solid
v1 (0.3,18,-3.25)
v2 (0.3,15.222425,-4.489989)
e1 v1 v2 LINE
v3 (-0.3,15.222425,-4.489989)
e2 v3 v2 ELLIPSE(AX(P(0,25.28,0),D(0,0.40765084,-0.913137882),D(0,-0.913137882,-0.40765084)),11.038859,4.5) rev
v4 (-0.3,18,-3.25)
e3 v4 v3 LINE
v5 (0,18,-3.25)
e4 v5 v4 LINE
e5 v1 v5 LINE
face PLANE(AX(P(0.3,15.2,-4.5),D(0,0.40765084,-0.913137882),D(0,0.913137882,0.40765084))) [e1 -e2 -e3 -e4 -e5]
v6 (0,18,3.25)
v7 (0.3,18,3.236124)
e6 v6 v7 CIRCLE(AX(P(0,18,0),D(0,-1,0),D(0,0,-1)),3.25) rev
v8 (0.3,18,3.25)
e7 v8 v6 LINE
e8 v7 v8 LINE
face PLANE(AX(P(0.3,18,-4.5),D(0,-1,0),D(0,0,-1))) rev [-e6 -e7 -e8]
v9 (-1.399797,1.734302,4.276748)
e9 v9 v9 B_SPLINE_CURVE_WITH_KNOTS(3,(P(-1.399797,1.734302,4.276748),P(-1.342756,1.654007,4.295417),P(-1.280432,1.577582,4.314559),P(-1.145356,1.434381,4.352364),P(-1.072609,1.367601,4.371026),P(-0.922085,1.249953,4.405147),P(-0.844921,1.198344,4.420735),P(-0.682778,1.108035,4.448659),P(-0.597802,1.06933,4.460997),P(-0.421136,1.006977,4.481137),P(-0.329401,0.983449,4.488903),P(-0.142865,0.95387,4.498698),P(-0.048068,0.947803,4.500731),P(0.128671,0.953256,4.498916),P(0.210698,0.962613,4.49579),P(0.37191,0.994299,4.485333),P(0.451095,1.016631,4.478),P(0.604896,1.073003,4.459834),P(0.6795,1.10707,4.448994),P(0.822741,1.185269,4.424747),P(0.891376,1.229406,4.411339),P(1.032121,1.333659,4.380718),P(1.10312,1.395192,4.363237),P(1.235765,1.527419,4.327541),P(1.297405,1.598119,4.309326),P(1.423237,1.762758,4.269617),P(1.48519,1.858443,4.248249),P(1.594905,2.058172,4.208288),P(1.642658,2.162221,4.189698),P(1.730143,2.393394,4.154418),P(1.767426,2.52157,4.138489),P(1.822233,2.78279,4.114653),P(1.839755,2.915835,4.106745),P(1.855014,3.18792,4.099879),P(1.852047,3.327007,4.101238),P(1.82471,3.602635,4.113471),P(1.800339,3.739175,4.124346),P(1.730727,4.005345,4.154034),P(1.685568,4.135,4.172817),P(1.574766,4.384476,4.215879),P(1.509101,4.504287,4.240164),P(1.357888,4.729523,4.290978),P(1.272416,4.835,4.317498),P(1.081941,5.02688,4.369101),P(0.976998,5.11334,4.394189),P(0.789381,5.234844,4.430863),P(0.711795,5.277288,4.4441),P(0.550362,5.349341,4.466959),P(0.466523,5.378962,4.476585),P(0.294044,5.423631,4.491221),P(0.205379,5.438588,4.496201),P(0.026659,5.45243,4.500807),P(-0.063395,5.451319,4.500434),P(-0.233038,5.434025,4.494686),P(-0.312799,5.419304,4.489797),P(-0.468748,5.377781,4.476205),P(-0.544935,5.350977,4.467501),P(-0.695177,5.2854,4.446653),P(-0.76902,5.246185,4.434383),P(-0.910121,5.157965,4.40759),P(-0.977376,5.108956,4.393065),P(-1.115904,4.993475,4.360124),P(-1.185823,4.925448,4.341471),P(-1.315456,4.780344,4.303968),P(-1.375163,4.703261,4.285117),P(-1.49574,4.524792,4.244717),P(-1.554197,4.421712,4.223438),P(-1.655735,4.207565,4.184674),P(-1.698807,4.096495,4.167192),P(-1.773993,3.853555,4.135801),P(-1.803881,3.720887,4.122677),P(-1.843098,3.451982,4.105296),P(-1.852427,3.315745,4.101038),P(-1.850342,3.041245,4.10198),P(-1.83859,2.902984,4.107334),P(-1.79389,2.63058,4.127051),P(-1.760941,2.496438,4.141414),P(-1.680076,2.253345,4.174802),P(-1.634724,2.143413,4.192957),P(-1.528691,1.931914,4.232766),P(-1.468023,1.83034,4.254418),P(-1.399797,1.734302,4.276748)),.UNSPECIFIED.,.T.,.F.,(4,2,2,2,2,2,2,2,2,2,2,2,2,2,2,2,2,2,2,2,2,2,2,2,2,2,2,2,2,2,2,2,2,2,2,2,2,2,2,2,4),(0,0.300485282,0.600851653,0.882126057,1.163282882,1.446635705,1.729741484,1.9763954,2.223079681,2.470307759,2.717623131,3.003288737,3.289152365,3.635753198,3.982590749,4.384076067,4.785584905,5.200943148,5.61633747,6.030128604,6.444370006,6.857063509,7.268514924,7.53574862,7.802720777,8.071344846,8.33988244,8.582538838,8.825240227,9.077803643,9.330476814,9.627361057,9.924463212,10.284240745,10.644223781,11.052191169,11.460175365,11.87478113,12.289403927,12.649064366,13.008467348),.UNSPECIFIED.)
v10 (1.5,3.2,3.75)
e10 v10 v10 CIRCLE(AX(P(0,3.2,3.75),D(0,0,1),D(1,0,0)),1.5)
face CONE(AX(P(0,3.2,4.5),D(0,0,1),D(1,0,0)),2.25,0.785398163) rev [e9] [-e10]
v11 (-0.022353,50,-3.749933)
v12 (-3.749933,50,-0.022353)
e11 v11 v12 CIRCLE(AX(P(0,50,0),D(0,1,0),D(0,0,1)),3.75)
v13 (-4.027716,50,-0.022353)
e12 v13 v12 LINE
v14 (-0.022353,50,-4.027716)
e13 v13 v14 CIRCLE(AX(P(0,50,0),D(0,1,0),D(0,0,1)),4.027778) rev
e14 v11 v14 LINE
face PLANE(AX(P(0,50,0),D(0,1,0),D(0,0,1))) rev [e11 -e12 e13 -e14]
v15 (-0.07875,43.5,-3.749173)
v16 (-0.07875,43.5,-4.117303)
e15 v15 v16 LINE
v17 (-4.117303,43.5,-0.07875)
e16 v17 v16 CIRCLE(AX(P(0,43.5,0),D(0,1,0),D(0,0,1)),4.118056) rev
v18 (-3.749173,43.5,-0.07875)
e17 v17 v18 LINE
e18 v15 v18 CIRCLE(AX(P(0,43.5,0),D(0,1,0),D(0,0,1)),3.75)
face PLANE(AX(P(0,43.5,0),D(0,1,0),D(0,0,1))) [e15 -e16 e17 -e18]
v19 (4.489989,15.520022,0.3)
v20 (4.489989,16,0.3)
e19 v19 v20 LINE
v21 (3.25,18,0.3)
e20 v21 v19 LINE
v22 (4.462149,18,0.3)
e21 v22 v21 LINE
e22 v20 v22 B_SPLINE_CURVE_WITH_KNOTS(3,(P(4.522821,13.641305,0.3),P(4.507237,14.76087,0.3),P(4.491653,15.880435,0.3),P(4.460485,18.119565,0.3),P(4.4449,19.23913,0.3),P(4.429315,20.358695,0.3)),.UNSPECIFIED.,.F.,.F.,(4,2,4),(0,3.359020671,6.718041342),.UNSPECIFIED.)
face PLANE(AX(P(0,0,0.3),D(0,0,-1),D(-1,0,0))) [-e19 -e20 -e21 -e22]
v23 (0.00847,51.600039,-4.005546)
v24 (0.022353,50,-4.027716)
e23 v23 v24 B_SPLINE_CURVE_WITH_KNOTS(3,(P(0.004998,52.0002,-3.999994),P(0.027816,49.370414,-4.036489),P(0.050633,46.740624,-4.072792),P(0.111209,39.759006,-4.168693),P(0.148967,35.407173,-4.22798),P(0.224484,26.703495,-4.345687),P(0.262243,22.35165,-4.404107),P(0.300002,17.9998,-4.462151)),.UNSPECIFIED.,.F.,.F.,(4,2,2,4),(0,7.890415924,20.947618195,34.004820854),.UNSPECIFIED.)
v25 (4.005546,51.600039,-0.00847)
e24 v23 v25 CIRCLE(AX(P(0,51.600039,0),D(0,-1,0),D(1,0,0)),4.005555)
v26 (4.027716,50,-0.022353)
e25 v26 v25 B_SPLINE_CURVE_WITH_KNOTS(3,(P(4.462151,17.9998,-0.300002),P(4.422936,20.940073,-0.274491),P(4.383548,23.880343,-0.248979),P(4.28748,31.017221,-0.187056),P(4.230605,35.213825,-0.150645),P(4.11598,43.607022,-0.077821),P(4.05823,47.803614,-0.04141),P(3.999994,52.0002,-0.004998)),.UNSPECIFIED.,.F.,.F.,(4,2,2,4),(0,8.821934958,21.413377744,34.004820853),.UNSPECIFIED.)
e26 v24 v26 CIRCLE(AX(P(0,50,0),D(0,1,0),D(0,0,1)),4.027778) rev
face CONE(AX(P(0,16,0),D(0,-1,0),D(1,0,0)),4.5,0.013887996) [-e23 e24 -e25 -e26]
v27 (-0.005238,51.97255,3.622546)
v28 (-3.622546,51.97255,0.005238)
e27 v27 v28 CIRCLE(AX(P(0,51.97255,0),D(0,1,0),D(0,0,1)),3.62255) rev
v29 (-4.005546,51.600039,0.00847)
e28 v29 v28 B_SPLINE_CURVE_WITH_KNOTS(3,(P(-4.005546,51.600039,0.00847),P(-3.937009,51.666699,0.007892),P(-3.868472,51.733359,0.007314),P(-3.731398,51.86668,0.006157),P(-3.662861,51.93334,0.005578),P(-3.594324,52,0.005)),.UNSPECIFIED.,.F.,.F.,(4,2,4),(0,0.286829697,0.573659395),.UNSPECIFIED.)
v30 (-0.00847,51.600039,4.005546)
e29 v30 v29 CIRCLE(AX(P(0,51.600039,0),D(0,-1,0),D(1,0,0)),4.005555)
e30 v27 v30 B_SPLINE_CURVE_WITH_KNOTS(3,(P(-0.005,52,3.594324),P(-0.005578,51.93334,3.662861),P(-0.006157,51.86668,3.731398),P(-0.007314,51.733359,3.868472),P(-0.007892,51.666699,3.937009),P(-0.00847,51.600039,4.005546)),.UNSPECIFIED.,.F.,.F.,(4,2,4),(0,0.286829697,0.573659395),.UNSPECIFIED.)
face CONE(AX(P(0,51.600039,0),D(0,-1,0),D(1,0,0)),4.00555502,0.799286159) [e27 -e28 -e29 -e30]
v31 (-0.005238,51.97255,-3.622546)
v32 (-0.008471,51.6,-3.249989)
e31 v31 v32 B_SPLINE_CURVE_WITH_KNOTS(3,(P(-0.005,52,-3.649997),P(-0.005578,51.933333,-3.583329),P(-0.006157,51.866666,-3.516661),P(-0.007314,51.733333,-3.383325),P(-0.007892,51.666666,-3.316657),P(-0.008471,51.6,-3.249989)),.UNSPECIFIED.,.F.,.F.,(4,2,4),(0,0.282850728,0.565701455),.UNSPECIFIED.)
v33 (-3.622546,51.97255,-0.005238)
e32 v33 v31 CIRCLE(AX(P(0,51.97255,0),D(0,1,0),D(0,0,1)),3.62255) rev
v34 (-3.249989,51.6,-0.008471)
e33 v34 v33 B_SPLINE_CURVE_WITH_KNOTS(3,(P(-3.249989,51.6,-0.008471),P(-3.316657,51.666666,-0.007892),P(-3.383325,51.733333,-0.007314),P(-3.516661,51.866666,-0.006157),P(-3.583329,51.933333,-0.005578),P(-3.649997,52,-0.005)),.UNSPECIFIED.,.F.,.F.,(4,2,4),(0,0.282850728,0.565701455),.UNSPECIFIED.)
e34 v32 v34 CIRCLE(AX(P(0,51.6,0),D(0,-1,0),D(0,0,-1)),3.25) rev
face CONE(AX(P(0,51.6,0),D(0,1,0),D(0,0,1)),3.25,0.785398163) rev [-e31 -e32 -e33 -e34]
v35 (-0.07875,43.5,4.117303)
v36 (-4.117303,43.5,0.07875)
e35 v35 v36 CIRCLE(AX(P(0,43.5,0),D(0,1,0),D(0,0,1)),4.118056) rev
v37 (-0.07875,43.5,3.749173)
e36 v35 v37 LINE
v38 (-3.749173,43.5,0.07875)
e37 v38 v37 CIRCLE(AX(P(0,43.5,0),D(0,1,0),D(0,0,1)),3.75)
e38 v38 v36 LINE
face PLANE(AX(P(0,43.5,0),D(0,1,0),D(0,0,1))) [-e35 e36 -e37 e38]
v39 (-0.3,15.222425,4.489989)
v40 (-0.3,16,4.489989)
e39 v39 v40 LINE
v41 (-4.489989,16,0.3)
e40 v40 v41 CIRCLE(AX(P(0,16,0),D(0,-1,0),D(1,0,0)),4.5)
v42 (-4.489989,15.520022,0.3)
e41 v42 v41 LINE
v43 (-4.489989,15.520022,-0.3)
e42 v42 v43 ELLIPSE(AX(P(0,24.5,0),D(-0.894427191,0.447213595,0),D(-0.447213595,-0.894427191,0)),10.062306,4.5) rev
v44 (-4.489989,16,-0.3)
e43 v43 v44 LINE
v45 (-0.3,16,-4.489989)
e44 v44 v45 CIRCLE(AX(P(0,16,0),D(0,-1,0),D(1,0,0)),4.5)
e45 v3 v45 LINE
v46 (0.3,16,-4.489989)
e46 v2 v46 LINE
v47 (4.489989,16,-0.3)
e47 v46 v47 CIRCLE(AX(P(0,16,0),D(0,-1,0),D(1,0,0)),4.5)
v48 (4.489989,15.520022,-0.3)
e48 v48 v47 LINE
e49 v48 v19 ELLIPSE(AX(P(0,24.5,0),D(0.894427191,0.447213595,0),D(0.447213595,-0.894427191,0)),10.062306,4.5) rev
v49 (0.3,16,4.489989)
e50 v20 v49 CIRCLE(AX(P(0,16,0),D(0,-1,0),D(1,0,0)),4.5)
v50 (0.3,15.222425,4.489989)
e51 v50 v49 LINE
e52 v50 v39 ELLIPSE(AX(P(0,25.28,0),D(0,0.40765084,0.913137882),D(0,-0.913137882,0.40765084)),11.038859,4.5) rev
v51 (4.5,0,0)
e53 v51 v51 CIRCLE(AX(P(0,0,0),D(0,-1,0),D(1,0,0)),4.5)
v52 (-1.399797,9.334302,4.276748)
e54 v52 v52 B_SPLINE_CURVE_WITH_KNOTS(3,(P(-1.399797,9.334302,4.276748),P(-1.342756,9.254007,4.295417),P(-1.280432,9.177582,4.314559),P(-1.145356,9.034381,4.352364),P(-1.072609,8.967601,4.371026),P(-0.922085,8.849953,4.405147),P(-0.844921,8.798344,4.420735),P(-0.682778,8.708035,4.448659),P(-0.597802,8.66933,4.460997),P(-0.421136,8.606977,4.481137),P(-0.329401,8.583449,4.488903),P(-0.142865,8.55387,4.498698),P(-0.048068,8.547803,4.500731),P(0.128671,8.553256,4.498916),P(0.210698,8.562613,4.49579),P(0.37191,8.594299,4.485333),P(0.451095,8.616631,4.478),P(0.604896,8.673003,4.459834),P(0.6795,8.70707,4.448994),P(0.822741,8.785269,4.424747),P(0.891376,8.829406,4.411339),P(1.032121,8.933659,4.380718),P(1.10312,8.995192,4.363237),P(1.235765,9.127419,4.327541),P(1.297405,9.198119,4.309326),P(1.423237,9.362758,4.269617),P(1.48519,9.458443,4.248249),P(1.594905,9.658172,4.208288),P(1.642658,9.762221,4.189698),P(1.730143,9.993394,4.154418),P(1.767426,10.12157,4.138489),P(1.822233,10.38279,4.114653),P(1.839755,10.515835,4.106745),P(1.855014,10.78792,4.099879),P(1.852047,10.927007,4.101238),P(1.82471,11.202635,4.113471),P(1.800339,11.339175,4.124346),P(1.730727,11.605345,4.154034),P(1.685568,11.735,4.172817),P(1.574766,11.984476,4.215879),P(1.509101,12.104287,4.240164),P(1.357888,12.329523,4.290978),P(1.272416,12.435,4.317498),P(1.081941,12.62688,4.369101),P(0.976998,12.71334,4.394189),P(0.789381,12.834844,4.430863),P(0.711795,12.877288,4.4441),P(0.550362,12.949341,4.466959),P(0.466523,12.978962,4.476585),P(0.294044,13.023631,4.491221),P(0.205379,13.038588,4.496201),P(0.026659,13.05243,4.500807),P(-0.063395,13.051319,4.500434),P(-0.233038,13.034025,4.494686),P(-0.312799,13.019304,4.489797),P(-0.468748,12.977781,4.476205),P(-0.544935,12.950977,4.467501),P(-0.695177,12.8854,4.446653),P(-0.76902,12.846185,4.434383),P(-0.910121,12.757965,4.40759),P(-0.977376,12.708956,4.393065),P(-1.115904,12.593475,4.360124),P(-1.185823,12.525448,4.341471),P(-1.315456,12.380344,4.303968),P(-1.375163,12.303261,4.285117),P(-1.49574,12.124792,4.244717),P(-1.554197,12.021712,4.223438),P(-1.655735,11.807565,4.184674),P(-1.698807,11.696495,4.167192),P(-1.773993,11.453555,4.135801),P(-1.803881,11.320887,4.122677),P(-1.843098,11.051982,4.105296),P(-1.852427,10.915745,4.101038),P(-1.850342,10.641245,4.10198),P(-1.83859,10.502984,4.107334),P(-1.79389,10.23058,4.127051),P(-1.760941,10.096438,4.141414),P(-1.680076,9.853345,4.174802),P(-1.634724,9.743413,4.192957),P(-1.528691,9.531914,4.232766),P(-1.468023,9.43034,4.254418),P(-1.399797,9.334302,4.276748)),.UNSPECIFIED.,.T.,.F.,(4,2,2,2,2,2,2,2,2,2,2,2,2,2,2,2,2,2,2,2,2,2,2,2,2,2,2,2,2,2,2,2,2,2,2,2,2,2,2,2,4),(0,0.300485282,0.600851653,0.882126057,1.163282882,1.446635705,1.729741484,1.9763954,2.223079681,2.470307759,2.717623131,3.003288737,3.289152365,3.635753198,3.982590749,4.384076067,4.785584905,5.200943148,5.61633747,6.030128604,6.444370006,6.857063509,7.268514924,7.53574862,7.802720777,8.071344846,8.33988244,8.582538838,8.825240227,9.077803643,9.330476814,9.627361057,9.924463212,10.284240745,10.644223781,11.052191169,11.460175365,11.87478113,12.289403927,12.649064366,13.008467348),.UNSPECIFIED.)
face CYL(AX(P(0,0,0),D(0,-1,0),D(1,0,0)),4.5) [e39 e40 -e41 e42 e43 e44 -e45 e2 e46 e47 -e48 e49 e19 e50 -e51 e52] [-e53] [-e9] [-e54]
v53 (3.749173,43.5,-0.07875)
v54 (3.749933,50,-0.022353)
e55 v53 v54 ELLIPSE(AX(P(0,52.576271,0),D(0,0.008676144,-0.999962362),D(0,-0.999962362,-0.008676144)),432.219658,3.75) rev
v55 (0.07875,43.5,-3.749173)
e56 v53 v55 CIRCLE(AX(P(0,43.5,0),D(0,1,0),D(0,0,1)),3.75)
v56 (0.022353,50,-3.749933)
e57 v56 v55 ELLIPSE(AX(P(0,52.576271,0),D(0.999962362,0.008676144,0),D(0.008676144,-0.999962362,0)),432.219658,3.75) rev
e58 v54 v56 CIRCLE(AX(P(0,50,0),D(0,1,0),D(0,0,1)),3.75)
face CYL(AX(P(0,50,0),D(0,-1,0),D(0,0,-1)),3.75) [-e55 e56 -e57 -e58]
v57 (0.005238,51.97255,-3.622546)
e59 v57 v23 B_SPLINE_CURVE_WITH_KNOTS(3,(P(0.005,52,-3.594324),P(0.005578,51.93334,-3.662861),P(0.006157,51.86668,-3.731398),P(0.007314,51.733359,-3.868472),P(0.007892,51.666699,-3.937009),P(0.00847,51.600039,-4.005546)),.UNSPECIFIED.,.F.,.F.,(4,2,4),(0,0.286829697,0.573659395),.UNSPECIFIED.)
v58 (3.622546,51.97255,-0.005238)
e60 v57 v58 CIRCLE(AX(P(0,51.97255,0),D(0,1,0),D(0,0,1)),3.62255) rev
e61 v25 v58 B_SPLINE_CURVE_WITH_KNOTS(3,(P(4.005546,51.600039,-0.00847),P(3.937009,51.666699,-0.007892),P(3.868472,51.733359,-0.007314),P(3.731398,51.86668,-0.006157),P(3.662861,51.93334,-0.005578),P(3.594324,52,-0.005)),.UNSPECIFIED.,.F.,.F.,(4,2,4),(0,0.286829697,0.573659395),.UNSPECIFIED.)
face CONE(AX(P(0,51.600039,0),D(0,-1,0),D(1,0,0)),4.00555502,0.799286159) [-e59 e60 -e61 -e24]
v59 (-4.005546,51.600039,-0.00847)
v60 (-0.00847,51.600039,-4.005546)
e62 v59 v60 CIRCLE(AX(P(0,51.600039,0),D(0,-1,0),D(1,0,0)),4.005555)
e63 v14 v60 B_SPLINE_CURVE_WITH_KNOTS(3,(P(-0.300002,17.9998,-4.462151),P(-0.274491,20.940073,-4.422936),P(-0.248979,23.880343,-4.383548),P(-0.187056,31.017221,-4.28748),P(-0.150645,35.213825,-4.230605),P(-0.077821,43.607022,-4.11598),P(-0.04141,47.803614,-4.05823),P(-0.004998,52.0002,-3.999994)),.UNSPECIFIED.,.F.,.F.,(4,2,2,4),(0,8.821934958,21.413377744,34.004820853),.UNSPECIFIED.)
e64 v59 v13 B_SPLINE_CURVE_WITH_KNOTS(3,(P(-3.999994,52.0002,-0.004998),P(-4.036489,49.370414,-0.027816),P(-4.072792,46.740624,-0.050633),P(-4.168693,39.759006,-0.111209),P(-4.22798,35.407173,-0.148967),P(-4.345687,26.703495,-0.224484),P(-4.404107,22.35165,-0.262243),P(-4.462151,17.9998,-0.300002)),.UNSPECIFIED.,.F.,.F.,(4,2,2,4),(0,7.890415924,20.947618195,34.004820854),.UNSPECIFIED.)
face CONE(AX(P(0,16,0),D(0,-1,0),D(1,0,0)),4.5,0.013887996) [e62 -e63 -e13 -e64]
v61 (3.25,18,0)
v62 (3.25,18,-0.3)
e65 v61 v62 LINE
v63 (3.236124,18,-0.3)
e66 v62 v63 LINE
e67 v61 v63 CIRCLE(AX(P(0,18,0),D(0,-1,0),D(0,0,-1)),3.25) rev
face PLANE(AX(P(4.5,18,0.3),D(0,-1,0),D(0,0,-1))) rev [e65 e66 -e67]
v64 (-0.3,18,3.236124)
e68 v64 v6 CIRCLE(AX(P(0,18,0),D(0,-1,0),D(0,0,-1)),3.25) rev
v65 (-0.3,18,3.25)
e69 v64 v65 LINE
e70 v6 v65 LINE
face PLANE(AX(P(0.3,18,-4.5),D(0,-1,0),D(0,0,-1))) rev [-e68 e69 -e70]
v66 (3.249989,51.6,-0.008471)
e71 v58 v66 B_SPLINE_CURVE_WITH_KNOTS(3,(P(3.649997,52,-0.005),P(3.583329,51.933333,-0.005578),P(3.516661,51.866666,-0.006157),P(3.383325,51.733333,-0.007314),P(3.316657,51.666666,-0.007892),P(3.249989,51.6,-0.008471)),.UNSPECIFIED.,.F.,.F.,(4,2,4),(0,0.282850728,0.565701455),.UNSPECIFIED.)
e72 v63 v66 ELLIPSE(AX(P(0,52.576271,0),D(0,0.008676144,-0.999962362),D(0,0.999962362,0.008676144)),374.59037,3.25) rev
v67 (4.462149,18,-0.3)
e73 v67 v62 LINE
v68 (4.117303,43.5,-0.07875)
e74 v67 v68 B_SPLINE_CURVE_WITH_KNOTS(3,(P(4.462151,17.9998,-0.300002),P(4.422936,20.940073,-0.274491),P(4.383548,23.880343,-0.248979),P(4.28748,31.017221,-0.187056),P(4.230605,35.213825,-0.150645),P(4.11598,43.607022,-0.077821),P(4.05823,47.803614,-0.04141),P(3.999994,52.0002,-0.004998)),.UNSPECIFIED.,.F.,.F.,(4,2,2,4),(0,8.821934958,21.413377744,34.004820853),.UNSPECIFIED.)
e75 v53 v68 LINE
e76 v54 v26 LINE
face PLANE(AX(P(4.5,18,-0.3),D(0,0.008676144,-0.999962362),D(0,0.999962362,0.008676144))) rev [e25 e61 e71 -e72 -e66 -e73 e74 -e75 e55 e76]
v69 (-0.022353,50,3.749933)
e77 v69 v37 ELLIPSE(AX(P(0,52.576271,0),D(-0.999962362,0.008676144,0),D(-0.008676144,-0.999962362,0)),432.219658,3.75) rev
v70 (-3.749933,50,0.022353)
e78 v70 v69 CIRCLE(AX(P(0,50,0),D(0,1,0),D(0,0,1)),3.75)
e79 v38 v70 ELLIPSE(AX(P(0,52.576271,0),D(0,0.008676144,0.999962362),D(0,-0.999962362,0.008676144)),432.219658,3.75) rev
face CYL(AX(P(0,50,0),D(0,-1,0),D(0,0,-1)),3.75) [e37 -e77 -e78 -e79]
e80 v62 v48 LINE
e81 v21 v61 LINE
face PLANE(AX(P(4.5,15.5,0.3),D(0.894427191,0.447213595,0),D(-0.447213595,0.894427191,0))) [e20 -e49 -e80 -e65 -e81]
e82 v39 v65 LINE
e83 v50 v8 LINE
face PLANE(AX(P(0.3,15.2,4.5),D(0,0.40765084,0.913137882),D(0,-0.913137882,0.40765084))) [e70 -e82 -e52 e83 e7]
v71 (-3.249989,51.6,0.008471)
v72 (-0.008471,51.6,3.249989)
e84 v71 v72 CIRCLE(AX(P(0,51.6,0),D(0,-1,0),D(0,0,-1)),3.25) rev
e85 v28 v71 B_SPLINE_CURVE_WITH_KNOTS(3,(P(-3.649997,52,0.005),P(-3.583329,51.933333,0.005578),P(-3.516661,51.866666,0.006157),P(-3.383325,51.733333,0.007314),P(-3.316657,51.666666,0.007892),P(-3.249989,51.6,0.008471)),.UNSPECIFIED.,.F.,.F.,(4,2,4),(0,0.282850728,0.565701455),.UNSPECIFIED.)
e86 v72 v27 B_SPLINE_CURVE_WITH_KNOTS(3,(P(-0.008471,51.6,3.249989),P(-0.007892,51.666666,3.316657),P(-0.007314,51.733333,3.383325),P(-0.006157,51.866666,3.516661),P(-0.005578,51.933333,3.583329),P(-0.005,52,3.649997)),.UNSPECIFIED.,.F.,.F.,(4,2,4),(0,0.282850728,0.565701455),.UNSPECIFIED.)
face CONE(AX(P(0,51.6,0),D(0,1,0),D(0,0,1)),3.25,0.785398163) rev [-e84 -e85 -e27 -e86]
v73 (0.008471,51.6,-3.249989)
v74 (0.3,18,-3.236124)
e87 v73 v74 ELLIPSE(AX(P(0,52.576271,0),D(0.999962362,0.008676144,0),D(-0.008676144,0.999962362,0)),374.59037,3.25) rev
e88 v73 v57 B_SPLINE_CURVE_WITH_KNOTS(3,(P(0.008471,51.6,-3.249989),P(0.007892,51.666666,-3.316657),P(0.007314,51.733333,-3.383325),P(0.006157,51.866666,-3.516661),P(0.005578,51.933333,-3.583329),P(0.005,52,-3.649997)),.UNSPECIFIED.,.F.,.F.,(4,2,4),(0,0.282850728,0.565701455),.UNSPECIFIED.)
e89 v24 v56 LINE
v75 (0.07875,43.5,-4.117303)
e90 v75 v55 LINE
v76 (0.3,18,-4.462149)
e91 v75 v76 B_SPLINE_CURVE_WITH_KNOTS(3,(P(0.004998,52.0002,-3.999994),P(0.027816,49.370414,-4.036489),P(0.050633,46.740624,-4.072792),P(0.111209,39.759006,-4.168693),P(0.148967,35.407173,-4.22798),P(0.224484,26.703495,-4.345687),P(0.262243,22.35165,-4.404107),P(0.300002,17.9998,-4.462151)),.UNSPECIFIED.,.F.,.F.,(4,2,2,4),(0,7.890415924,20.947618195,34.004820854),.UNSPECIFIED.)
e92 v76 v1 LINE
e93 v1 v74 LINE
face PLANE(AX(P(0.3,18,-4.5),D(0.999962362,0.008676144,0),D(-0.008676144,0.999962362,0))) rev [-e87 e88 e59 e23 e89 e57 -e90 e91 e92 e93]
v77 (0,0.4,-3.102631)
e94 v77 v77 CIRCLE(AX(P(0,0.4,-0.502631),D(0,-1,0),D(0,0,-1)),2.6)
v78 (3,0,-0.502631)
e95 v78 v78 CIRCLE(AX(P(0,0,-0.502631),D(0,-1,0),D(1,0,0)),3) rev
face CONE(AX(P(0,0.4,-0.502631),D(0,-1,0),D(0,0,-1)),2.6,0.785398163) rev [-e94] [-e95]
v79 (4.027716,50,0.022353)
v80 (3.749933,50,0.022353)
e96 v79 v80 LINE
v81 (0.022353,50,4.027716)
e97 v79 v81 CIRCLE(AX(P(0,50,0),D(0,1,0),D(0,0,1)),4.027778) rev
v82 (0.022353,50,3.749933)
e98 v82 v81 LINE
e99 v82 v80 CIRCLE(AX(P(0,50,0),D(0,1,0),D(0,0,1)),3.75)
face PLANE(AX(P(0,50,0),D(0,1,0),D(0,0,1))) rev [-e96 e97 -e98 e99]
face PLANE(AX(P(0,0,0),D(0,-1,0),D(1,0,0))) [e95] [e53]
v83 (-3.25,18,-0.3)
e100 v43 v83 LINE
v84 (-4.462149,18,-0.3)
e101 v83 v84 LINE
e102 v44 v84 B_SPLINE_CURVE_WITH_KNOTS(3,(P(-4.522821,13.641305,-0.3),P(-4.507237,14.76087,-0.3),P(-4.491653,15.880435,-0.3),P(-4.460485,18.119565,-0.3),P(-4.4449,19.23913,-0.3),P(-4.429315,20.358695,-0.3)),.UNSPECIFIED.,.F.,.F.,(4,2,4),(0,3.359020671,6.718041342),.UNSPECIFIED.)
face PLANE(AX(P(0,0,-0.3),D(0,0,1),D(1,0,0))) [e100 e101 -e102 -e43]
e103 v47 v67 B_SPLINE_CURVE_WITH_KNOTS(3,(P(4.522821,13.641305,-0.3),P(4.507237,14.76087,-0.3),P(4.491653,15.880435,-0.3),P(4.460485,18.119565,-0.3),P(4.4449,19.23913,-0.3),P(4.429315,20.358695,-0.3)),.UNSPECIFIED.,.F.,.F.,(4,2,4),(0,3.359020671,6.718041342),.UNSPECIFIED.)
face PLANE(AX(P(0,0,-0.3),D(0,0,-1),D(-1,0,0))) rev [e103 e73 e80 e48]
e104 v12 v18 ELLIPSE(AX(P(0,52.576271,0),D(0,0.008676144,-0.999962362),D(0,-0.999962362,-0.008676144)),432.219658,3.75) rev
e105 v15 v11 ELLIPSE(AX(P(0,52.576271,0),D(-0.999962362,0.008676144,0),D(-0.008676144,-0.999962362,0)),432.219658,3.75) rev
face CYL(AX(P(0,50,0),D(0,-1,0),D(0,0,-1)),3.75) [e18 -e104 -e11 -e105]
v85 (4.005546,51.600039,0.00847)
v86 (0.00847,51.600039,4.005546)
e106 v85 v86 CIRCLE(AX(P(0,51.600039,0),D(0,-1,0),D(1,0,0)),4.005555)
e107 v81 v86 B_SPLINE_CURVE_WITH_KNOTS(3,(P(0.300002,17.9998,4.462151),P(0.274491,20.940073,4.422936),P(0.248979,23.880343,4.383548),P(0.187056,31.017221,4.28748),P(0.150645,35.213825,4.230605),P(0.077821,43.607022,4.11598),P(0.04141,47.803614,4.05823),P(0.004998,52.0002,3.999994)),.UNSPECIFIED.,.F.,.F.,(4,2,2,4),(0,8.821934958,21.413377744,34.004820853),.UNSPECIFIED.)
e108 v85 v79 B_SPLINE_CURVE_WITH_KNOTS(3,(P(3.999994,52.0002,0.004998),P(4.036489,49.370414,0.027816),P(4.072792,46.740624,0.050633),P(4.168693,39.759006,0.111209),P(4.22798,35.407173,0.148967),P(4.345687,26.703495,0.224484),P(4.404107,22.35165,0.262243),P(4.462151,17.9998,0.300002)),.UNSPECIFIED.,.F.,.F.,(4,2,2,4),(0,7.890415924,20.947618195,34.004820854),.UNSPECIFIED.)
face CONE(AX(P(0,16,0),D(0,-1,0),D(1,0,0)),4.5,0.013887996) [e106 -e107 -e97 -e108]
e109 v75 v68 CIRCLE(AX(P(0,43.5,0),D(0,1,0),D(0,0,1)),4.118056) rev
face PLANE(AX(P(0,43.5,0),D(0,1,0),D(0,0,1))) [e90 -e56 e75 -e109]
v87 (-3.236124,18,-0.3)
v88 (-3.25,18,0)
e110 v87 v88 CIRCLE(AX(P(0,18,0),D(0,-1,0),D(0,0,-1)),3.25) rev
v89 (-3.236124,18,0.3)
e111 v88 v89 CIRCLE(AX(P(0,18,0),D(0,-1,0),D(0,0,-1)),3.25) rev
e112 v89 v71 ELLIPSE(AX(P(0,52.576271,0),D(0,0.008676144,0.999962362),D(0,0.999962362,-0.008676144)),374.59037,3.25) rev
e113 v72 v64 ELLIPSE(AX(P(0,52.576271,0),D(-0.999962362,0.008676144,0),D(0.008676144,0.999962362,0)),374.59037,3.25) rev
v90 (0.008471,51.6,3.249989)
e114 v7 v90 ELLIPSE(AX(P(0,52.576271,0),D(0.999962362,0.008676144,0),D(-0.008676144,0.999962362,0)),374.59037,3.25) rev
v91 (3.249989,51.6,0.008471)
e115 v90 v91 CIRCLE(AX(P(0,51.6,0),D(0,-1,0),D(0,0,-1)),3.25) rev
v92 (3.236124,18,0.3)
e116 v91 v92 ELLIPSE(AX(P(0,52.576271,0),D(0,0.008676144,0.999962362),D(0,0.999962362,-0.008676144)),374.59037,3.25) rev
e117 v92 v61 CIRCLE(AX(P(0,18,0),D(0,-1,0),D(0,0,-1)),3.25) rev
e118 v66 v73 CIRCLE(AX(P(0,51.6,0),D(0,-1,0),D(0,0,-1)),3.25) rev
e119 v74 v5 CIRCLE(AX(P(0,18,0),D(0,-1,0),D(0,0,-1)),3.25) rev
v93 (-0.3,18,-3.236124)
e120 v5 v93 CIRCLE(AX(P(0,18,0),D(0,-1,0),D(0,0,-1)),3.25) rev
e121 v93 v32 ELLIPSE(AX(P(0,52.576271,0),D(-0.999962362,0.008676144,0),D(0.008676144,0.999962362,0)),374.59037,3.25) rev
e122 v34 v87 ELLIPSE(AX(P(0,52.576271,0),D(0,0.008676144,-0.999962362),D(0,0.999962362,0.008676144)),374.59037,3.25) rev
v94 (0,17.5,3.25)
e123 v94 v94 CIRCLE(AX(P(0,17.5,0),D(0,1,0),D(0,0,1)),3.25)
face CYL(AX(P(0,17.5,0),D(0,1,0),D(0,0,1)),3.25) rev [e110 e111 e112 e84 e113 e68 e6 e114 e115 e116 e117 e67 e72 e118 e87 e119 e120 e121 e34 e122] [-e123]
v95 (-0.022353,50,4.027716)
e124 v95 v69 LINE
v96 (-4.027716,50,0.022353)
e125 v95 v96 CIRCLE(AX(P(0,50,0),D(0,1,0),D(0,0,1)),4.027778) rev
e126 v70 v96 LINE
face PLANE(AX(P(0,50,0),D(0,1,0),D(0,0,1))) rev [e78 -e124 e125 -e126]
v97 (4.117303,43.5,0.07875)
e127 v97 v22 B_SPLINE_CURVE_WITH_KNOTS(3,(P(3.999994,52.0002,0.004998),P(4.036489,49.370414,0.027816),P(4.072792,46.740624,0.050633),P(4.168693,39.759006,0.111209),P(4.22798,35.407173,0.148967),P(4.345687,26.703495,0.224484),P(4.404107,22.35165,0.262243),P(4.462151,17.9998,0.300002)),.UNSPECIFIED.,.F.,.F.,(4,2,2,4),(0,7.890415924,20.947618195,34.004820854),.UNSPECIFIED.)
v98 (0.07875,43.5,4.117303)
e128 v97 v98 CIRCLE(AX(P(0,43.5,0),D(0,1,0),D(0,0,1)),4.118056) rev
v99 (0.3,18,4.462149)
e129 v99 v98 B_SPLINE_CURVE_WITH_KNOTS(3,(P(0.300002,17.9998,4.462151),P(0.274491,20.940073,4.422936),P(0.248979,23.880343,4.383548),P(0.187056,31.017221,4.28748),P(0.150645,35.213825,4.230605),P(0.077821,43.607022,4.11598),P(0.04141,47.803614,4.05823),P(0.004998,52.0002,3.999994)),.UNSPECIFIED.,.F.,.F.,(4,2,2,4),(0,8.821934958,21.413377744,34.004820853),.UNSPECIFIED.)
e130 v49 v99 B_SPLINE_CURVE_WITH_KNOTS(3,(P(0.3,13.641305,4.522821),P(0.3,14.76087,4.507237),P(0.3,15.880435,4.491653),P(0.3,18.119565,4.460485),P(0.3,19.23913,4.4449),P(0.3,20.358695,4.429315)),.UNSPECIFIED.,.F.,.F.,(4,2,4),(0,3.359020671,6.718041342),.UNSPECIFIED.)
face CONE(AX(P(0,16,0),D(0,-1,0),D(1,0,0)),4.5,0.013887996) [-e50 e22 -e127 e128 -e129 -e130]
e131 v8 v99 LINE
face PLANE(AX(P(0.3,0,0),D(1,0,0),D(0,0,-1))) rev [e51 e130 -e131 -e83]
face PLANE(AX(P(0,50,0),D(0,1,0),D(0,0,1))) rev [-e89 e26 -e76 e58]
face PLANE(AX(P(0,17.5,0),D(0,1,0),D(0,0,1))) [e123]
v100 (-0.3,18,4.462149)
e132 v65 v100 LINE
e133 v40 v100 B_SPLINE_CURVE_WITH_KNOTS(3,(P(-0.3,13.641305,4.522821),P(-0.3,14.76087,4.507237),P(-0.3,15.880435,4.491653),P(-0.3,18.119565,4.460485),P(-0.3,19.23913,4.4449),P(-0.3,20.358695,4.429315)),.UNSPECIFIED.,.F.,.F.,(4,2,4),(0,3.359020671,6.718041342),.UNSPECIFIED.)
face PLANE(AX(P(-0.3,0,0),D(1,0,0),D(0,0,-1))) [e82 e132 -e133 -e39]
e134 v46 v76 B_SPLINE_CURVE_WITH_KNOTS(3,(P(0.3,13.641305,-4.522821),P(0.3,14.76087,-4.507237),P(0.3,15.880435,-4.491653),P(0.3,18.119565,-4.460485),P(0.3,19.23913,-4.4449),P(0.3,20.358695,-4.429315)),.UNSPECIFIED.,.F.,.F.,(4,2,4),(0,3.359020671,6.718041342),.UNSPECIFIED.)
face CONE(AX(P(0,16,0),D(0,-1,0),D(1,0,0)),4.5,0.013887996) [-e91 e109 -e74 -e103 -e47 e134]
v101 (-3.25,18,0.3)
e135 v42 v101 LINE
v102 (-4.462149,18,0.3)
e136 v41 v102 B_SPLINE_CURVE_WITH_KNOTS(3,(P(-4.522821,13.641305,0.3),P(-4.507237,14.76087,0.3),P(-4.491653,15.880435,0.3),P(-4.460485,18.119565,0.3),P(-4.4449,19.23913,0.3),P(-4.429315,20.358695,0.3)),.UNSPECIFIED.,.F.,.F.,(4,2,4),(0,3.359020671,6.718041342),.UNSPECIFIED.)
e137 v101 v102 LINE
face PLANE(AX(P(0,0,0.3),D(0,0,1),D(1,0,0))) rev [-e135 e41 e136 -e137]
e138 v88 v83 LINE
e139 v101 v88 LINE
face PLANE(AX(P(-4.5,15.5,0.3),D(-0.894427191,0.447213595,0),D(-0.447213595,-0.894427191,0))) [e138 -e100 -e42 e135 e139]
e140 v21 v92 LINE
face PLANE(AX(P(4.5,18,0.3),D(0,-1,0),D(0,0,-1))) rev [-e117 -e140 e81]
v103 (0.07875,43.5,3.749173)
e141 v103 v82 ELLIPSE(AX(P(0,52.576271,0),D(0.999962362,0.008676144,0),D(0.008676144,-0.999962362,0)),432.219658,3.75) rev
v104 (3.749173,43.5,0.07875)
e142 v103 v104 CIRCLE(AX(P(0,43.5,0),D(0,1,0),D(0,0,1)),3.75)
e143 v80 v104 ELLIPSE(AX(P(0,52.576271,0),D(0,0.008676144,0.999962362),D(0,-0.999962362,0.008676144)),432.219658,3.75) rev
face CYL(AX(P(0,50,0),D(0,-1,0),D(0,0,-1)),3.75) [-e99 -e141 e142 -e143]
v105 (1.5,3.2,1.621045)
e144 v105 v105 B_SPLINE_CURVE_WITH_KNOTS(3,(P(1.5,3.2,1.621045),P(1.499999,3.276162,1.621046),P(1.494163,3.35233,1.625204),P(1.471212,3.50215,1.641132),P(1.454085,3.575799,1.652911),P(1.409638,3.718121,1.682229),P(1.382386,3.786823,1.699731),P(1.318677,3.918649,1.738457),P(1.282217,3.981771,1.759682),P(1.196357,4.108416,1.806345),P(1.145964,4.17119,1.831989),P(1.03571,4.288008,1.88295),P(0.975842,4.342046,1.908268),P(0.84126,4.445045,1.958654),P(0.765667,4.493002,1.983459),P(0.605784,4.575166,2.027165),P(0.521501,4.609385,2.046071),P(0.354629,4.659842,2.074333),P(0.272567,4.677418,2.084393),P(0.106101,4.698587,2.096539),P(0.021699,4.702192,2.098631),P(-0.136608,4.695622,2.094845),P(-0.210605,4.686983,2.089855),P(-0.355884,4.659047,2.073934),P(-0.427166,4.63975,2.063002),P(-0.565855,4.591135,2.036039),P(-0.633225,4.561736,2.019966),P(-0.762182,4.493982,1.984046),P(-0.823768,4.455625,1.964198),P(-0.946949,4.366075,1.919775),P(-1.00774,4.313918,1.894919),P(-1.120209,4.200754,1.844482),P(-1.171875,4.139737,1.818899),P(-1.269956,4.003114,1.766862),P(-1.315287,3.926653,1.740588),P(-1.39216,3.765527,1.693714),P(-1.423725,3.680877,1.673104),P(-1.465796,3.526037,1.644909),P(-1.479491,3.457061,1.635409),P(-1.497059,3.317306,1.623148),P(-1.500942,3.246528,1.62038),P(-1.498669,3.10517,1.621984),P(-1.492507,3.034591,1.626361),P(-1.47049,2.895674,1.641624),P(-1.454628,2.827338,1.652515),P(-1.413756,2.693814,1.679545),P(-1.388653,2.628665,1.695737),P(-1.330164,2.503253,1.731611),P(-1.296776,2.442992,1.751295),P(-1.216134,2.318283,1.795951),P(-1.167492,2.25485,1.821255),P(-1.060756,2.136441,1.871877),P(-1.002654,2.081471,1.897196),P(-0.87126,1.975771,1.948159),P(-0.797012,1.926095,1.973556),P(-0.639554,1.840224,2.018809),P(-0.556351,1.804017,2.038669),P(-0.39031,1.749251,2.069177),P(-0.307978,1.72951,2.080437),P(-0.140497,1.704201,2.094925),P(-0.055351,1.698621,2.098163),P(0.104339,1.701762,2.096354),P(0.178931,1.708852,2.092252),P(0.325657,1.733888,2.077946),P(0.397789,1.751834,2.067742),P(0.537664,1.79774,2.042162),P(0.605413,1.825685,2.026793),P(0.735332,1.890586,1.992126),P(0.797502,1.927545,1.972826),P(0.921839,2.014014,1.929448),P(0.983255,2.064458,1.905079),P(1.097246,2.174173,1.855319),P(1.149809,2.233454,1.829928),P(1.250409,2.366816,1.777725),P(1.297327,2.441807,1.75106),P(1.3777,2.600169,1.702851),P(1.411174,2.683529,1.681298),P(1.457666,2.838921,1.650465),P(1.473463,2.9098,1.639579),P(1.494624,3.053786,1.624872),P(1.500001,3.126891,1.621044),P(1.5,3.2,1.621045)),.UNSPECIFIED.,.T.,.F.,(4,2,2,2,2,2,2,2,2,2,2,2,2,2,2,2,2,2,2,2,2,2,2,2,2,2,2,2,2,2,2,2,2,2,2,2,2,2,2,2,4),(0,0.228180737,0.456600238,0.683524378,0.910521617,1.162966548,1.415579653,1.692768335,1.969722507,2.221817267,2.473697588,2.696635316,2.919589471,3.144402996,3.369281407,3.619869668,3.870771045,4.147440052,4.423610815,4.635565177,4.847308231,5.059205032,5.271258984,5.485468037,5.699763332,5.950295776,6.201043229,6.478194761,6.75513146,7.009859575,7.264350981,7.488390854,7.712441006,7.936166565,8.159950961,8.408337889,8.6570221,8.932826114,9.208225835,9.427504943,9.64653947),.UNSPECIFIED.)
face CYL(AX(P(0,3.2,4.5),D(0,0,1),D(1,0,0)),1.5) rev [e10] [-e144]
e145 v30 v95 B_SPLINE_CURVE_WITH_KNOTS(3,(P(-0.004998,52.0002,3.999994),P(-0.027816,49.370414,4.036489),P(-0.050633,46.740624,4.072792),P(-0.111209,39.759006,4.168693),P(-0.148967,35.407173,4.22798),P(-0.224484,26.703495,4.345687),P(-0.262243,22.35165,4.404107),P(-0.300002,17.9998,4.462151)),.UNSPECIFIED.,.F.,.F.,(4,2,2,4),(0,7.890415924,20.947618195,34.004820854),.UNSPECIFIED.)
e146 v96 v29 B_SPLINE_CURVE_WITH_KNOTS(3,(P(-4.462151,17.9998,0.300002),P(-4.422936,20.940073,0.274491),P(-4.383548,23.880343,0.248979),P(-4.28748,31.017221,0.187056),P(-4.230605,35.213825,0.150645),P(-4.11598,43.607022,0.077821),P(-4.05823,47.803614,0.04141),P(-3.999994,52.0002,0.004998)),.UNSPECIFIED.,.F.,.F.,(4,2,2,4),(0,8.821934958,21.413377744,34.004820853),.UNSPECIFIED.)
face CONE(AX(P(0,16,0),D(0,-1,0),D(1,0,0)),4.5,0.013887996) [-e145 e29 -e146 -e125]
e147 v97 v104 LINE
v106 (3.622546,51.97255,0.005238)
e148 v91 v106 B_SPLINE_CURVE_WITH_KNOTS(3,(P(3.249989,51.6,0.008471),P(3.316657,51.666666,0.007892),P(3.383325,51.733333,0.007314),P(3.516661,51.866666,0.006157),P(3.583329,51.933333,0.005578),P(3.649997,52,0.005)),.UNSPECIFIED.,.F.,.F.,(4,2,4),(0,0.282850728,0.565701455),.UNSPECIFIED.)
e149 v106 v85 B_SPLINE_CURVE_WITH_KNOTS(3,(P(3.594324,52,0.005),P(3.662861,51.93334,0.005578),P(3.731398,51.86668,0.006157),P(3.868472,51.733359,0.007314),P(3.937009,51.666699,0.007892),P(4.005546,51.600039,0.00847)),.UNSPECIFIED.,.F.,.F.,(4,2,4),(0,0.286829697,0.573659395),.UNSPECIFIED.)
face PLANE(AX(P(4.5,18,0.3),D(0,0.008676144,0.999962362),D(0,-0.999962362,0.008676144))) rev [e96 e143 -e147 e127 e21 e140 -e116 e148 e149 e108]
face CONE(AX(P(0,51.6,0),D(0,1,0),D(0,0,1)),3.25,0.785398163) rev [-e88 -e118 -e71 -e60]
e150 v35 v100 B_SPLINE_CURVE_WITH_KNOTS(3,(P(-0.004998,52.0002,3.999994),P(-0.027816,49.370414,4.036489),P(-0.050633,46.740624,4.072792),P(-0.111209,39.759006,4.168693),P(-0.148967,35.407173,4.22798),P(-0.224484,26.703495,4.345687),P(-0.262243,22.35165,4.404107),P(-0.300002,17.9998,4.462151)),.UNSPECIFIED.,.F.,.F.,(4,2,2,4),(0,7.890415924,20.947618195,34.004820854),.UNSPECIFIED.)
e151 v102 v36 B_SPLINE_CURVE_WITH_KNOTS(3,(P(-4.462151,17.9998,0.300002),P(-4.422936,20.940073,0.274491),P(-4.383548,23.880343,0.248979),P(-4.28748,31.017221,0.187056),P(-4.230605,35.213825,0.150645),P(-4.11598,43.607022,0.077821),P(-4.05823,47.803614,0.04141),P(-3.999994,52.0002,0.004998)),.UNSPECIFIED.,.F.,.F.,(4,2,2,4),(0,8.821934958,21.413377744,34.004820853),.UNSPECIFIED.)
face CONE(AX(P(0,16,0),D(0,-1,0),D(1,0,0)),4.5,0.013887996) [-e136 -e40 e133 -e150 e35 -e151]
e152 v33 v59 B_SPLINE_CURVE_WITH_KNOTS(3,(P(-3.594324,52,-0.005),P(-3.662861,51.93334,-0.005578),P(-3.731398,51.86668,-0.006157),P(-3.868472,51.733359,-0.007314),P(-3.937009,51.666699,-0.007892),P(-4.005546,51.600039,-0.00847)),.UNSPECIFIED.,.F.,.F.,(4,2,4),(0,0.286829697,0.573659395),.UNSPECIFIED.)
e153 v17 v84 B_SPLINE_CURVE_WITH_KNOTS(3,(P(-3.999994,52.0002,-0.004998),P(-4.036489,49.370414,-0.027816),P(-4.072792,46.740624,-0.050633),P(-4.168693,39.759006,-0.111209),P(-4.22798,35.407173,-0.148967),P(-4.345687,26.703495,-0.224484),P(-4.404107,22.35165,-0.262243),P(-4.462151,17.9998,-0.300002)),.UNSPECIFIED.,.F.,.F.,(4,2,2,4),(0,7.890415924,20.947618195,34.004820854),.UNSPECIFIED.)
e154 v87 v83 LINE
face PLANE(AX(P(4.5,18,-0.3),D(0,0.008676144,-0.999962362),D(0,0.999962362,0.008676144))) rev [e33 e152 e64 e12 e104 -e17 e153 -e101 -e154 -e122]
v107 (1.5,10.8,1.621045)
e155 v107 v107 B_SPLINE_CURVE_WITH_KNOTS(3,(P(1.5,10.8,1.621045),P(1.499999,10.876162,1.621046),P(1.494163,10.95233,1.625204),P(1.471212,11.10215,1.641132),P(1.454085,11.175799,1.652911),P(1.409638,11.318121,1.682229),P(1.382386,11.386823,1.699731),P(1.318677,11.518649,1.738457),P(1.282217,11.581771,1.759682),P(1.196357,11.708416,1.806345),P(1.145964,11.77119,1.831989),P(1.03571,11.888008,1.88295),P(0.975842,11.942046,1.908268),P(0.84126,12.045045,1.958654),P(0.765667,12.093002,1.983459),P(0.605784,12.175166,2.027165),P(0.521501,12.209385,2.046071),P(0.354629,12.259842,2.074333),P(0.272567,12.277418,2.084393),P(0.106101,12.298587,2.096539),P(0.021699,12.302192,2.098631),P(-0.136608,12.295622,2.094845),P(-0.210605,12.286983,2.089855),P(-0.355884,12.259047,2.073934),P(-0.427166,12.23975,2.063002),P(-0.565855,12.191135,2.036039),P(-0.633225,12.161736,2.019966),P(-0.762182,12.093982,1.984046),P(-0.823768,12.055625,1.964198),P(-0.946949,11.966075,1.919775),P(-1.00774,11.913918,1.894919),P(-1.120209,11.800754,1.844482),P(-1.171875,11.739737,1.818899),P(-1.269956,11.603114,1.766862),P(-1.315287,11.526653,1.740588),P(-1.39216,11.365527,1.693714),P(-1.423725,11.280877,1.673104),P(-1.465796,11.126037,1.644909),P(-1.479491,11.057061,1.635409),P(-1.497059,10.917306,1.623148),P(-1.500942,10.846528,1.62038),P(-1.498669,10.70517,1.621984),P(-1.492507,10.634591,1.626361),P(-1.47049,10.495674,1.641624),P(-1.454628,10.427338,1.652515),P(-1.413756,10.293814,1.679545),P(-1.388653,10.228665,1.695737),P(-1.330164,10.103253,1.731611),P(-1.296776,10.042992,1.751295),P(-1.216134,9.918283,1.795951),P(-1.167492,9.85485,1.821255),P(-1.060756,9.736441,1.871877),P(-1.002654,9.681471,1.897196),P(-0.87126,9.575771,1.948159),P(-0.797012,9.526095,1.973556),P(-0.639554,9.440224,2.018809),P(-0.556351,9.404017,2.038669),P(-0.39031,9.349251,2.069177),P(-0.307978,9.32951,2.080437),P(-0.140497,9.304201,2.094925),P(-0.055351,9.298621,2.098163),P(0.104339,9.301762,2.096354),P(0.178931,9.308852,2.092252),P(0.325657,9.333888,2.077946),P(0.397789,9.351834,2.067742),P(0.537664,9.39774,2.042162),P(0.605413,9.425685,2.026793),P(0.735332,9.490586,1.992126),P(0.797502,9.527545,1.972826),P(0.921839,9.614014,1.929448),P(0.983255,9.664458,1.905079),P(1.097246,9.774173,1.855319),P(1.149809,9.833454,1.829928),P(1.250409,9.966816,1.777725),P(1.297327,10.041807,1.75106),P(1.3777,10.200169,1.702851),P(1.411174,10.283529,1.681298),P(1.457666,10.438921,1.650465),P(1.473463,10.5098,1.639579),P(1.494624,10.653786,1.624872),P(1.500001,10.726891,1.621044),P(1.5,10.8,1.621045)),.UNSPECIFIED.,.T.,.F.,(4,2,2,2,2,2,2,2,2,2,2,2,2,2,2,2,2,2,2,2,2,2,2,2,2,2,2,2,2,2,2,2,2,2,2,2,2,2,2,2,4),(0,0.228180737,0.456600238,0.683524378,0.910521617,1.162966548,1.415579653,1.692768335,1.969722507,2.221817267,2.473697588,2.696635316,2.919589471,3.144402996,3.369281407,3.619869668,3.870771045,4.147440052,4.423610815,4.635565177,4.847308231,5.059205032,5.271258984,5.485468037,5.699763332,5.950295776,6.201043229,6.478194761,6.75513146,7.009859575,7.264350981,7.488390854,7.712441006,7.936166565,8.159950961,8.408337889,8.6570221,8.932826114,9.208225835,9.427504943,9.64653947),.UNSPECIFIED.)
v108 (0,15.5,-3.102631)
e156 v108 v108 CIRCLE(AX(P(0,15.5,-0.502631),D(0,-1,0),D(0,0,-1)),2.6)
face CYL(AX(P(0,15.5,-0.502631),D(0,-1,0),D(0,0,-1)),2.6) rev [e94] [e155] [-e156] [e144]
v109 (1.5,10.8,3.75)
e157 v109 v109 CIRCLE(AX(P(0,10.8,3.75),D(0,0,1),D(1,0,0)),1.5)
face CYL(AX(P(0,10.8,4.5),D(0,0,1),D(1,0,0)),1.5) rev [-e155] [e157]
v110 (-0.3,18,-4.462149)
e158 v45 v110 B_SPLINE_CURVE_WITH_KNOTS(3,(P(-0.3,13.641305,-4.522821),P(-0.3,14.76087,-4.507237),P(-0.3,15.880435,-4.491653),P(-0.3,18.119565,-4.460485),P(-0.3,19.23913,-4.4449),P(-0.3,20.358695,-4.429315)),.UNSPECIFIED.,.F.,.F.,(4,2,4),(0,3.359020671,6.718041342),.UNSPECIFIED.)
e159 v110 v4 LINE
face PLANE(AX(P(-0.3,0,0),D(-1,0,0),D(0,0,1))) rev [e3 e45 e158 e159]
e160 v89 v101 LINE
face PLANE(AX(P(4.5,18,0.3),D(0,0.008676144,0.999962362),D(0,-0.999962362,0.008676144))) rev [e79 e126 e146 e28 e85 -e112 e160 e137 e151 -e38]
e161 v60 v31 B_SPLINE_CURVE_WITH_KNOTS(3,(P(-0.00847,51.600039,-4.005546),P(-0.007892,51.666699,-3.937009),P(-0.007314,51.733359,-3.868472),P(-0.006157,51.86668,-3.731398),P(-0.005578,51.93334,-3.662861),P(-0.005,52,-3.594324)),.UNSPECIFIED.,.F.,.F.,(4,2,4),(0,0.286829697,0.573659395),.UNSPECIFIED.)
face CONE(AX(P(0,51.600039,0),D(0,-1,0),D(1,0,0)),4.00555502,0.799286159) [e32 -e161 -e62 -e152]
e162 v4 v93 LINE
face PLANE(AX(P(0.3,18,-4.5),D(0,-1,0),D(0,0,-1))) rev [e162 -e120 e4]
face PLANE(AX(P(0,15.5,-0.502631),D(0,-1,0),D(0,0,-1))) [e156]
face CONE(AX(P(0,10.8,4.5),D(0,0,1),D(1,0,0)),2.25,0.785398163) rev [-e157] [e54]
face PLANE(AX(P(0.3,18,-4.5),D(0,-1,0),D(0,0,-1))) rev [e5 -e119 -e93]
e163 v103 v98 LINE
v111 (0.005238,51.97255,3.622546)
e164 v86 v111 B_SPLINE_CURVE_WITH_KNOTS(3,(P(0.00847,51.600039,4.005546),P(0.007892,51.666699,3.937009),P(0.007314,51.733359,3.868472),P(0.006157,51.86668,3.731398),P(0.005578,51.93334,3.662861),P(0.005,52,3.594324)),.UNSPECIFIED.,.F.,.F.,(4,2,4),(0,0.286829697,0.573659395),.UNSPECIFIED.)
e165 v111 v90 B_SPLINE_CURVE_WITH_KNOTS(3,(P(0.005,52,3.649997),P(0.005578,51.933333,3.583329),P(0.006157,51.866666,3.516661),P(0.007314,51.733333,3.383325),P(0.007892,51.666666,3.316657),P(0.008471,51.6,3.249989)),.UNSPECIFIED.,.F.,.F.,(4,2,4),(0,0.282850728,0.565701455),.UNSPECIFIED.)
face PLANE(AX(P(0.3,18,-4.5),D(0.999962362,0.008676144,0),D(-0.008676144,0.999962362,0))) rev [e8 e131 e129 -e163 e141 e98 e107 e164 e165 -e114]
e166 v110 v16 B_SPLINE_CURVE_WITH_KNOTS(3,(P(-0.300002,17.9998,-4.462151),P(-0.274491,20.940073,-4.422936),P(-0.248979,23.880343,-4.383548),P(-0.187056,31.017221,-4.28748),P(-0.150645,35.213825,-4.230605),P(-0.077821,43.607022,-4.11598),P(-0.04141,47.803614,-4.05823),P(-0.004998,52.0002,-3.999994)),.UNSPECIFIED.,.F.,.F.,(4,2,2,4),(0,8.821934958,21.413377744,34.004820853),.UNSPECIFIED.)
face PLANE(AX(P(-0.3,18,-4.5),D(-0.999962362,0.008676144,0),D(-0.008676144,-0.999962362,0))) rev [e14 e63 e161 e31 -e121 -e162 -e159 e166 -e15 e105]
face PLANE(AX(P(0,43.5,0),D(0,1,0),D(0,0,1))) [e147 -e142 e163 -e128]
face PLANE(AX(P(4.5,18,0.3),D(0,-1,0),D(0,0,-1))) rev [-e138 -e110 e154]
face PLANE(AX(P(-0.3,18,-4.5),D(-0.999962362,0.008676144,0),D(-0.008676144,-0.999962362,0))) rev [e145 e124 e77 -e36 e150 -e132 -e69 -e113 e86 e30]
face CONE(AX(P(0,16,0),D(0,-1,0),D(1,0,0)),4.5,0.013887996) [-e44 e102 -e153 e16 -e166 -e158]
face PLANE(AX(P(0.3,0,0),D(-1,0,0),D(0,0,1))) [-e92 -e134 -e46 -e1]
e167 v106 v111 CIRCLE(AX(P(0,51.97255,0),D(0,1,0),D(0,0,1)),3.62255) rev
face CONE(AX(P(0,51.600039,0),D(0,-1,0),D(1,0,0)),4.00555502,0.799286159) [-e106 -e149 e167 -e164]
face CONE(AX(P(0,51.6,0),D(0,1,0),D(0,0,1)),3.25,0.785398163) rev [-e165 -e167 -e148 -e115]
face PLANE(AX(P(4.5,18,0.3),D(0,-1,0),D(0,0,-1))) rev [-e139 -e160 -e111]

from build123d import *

# Parameters (mm, degrees)
SKETCH1_W               = 4.5
SKETCH1_H               = 16
SKETCH2_R               = 3.25
CUT_EXTRUDE1_DEPTH      = 34.5
SKETCH3_R               = 2.6
CUT_EXTRUDE2_DEPTH      = 15.5
CUT_EXTRUDE3_DEPTH      = 53.964610826
CUT_EXTRUDE4_DEPTH      = 53.96461095
CUT_EXTRUDE5_DEPTH      = 0.3
CUT_EXTRUDE5_DEPTH_BACK = 0.3
CUT_EXTRUDE6_DEPTH      = 0.3
CUT_EXTRUDE6_DEPTH_BACK = 0.3
SKETCH15_R              = 4.674572256
SKETCH15_R_2            = 3.75
CUT_EXTRUDE7_DEPTH      = 6.5
CHAMFER1_SIZE           = 0.405672925
CHAMFER1_SIZE_2         = 0.4


with BuildPart() as part:
    # Sketch1 → Revolve1 (revolve)
    with BuildSketch(Plane.XY):
        Polygon((0, 16), (4.5, 16), (4, 52), (0, 52), align=None)
        with Locations((2.25, 8)):
            Rectangle(SKETCH1_W, SKETCH1_H)
    revolve(axis=Axis((0, 0, 0), (0, 1, 0)))

    # Sketch2 → Cut-Extrude1 (cut)
    with BuildSketch(Plane(origin=(0, 52, 0), x_dir=(1, 0, 0), z_dir=(0, 1, 0))):
        with Locations(Location((0, 0, 0), (0, 0, 270))):
            Circle(SKETCH2_R)
    extrude(amount=-CUT_EXTRUDE1_DEPTH, mode=Mode.SUBTRACT)

    # Sketch3 → Cut-Extrude2 (cut)
    with BuildSketch(Plane.XZ):
        with Locations(Location((0, -0.502631205, 0), (0, 0, 270))):
            Circle(SKETCH3_R)
    extrude(amount=-CUT_EXTRUDE2_DEPTH, mode=Mode.SUBTRACT)

    # Sketch5 → Cut-Extrude3 (cut, through all)
    with BuildSketch(Plane.ZY.offset(4.5)):
        Polygon((0.3, 18), (-0.3, 18), (-0.005, 52), (0.005, 52), align=None)
    extrude(amount=-CUT_EXTRUDE3_DEPTH, mode=Mode.SUBTRACT)

    # Sketch9 → Cut-Extrude4 (cut, through all)
    with BuildSketch(Plane.XY.offset(4.5)):
        Polygon((0.3, 18), (-0.3, 18), (-0.005, 52), (0.005, 52), align=None)
    extrude(amount=-CUT_EXTRUDE4_DEPTH, mode=Mode.SUBTRACT)

    # Sketch11 → Cut-Extrude5 (cut, two sides: drawn at the far end of the back side and taken through both)
    with BuildSketch(Plane.XY.offset(-CUT_EXTRUDE5_DEPTH_BACK)):
        Polygon((4.70526545, 18), (4.5, 15.5), (3.25, 18), align=None)
        Polygon((-3.25, 18), (-4.70526545, 18), (-4.5, 15.5), align=None)
    extrude(amount=CUT_EXTRUDE5_DEPTH + CUT_EXTRUDE5_DEPTH_BACK, mode=Mode.SUBTRACT)

    # Sketch14 → Cut-Extrude6 (cut, two sides: drawn at the far end of the back side and taken through both)
    with BuildSketch(Plane(origin=(0, 0, 0), x_dir=(0, 0, -1), z_dir=(1, 0, 0)).offset(-CUT_EXTRUDE6_DEPTH_BACK)):
        Polygon((4.63635838, 18), (4.5, 15.2), (3.25, 18), align=None)
        Polygon((-3.25, 18), (-4.63635838, 18), (-4.5, 15.2), align=None)
    extrude(amount=CUT_EXTRUDE6_DEPTH + CUT_EXTRUDE6_DEPTH_BACK, mode=Mode.SUBTRACT)

    # Sketch15 → Cut-Extrude7 (cut)
    with BuildSketch(Plane(origin=(0, 43.5, 0), x_dir=(1, 0, 0), z_dir=(0, 1, 0))):
        Circle(SKETCH15_R)
        Circle(SKETCH15_R_2, mode=Mode.SUBTRACT)
    extrude(amount=CUT_EXTRUDE7_DEPTH, mode=Mode.SUBTRACT)

    # CSK for M3 Oval Head Machine Screw1: read off the stored shape, not the designer's step
    # CSK for M3 Oval Head Machine Screw1 outl → CSK for M3 Oval Head Machine Screw1 (revolve, cut)
    with BuildSketch(Plane.XZ.offset(-10.8)):
        Polygon((0, 1.620808174), (1.5, 1.620808174), (1.5, 3.75), (2.250171478, 4.500171478), (0, 4.500171478), align=None)
    revolve(axis=Axis((0, 10.8, 0), (0, 0, 1)), mode=Mode.SUBTRACT)

    # CSK for M3 Oval Head Machine Screw1 2 ou → CSK for M3 Oval Head Machine Screw1 2 (revolve, cut)
    with BuildSketch(Plane.XZ.offset(-3.2)):
        Polygon((0, 1.620808174), (1.5, 1.620808174), (1.5, 3.75), (2.250171478, 4.500171478), (0, 4.500171478), align=None)
    revolve(axis=Axis((0, 3.2, 0), (0, 0, 1)), mode=Mode.SUBTRACT)

    # Chamfer1
    # the kernel refuses this chamfer: 0.405672925, 0.4 mm, written as the material it takes off along each edge
    with BuildSketch(Plane(origin=(0, 52, 0), x_dir=(-0.9664500718694985, 0, -0.2568545475233819), z_dir=(0.2568545475233819, 0, -0.9664500718694985))) as chamfer1_piece_1:
        Polygon((4 - CHAMFER1_SIZE * 0.999999998918, 0), (4 + CHAMFER1_SIZE_2 * 0.0138875494908, -CHAMFER1_SIZE_2 * 0.999903563335), (4, 0), align=None)
    revolve(axis=Axis((0, 52, 0), (0, 1, 0)), revolution_arc=119.767007275, mode=Mode.SUBTRACT)
    with BuildSketch(Plane(origin=(0, 52, 0), x_dir=(-0.2568545475233686, 0, 0.9664500718695019), z_dir=(-0.9664500718695019, 0, -0.2568545475233686))) as chamfer1_piece_2:
        Polygon((4 - CHAMFER1_SIZE * 0.999999998918, 0), (4 + CHAMFER1_SIZE_2 * 0.0138875494908, -CHAMFER1_SIZE_2 * 0.999903563335), (4, 0), align=None)
    revolve(axis=Axis((0, 52, 0), (0, 1, 0)), revolution_arc=119.767007275, mode=Mode.SUBTRACT)
    with BuildSketch(Plane(origin=(0, 52, 0), x_dir=(0.9664500718695013, 0, 0.25685454752337145), z_dir=(-0.25685454752337145, 0, 0.9664500718695013))) as chamfer1_piece_3:
        Polygon((4 - CHAMFER1_SIZE * 0.999999998918, 0), (4 + CHAMFER1_SIZE_2 * 0.0138875494908, -CHAMFER1_SIZE_2 * 0.999903563335), (4, 0), align=None)
    revolve(axis=Axis((0, 52, 0), (0, 1, 0)), revolution_arc=119.767007275, mode=Mode.SUBTRACT)
    with BuildSketch(Plane(origin=(0, 52, 0), x_dir=(0.2568545475233668, 0, -0.9664500718695025), z_dir=(0.9664500718695025, 0, 0.2568545475233668))) as chamfer1_piece_4:
        Polygon((4 - CHAMFER1_SIZE * 0.999999998918, 0), (4 + CHAMFER1_SIZE_2 * 0.0138875494908, -CHAMFER1_SIZE_2 * 0.999903563335), (4, 0), align=None)
    revolve(axis=Axis((0, 52, 0), (0, 1, 0)), revolution_arc=119.767007275, mode=Mode.SUBTRACT)
    with BuildSketch(Plane(origin=(0, 52, 0), x_dir=(-0.950764457827211, 0, -0.30991441678716625), z_dir=(0.30991441678716625, 0, -0.950764457827211))) as chamfer1_piece_5:
        Polygon((3.25, -CHAMFER1_SIZE_2), (3.25 + CHAMFER1_SIZE_2, 0), (3.25, 0), align=None)
    revolve(axis=Axis((0, 52, 0), (0, 1, 0)), revolution_arc=126.108145853, mode=Mode.SUBTRACT)
    with BuildSketch(Plane(origin=(0, 52, 0), x_dir=(-0.3099144167871693, 0, 0.9507644578272101), z_dir=(-0.9507644578272101, 0, -0.3099144167871693))) as chamfer1_piece_6:
        Polygon((3.25, -CHAMFER1_SIZE_2), (3.25 + CHAMFER1_SIZE_2, 0), (3.25, 0), align=None)
    revolve(axis=Axis((0, 52, 0), (0, 1, 0)), revolution_arc=126.108145853, mode=Mode.SUBTRACT)
    with BuildSketch(Plane(origin=(0, 52, 0), x_dir=(0.9507644578272096, 0, 0.3099144167871707), z_dir=(-0.3099144167871707, 0, 0.9507644578272096))) as chamfer1_piece_7:
        Polygon((3.25, -CHAMFER1_SIZE_2), (3.25 + CHAMFER1_SIZE_2, 0), (3.25, 0), align=None)
    revolve(axis=Axis((0, 52, 0), (0, 1, 0)), revolution_arc=126.108145853, mode=Mode.SUBTRACT)
    with BuildSketch(Plane(origin=(0, 52, 0), x_dir=(0.309914416787165, 0, -0.9507644578272114), z_dir=(0.9507644578272114, 0, 0.309914416787165))) as chamfer1_piece_8:
        Polygon((3.25, -CHAMFER1_SIZE_2), (3.25 + CHAMFER1_SIZE_2, 0), (3.25, 0), align=None)
    revolve(axis=Axis((0, 52, 0), (0, 1, 0)), revolution_arc=126.108145853, mode=Mode.SUBTRACT)
    with BuildSketch(Plane(origin=(0, 0, -0.502631205), x_dir=(0, 0, -1), z_dir=(-1, 0, 0))) as chamfer1_piece_9:
        Polygon((2.6 + CHAMFER1_SIZE_2, 0), (2.6, -CHAMFER1_SIZE_2), (2.6, 0), align=None)
    revolve(axis=Axis((0, 0, -0.502631205), (0, -1, 0)), mode=Mode.SUBTRACT)


solid = part.part
